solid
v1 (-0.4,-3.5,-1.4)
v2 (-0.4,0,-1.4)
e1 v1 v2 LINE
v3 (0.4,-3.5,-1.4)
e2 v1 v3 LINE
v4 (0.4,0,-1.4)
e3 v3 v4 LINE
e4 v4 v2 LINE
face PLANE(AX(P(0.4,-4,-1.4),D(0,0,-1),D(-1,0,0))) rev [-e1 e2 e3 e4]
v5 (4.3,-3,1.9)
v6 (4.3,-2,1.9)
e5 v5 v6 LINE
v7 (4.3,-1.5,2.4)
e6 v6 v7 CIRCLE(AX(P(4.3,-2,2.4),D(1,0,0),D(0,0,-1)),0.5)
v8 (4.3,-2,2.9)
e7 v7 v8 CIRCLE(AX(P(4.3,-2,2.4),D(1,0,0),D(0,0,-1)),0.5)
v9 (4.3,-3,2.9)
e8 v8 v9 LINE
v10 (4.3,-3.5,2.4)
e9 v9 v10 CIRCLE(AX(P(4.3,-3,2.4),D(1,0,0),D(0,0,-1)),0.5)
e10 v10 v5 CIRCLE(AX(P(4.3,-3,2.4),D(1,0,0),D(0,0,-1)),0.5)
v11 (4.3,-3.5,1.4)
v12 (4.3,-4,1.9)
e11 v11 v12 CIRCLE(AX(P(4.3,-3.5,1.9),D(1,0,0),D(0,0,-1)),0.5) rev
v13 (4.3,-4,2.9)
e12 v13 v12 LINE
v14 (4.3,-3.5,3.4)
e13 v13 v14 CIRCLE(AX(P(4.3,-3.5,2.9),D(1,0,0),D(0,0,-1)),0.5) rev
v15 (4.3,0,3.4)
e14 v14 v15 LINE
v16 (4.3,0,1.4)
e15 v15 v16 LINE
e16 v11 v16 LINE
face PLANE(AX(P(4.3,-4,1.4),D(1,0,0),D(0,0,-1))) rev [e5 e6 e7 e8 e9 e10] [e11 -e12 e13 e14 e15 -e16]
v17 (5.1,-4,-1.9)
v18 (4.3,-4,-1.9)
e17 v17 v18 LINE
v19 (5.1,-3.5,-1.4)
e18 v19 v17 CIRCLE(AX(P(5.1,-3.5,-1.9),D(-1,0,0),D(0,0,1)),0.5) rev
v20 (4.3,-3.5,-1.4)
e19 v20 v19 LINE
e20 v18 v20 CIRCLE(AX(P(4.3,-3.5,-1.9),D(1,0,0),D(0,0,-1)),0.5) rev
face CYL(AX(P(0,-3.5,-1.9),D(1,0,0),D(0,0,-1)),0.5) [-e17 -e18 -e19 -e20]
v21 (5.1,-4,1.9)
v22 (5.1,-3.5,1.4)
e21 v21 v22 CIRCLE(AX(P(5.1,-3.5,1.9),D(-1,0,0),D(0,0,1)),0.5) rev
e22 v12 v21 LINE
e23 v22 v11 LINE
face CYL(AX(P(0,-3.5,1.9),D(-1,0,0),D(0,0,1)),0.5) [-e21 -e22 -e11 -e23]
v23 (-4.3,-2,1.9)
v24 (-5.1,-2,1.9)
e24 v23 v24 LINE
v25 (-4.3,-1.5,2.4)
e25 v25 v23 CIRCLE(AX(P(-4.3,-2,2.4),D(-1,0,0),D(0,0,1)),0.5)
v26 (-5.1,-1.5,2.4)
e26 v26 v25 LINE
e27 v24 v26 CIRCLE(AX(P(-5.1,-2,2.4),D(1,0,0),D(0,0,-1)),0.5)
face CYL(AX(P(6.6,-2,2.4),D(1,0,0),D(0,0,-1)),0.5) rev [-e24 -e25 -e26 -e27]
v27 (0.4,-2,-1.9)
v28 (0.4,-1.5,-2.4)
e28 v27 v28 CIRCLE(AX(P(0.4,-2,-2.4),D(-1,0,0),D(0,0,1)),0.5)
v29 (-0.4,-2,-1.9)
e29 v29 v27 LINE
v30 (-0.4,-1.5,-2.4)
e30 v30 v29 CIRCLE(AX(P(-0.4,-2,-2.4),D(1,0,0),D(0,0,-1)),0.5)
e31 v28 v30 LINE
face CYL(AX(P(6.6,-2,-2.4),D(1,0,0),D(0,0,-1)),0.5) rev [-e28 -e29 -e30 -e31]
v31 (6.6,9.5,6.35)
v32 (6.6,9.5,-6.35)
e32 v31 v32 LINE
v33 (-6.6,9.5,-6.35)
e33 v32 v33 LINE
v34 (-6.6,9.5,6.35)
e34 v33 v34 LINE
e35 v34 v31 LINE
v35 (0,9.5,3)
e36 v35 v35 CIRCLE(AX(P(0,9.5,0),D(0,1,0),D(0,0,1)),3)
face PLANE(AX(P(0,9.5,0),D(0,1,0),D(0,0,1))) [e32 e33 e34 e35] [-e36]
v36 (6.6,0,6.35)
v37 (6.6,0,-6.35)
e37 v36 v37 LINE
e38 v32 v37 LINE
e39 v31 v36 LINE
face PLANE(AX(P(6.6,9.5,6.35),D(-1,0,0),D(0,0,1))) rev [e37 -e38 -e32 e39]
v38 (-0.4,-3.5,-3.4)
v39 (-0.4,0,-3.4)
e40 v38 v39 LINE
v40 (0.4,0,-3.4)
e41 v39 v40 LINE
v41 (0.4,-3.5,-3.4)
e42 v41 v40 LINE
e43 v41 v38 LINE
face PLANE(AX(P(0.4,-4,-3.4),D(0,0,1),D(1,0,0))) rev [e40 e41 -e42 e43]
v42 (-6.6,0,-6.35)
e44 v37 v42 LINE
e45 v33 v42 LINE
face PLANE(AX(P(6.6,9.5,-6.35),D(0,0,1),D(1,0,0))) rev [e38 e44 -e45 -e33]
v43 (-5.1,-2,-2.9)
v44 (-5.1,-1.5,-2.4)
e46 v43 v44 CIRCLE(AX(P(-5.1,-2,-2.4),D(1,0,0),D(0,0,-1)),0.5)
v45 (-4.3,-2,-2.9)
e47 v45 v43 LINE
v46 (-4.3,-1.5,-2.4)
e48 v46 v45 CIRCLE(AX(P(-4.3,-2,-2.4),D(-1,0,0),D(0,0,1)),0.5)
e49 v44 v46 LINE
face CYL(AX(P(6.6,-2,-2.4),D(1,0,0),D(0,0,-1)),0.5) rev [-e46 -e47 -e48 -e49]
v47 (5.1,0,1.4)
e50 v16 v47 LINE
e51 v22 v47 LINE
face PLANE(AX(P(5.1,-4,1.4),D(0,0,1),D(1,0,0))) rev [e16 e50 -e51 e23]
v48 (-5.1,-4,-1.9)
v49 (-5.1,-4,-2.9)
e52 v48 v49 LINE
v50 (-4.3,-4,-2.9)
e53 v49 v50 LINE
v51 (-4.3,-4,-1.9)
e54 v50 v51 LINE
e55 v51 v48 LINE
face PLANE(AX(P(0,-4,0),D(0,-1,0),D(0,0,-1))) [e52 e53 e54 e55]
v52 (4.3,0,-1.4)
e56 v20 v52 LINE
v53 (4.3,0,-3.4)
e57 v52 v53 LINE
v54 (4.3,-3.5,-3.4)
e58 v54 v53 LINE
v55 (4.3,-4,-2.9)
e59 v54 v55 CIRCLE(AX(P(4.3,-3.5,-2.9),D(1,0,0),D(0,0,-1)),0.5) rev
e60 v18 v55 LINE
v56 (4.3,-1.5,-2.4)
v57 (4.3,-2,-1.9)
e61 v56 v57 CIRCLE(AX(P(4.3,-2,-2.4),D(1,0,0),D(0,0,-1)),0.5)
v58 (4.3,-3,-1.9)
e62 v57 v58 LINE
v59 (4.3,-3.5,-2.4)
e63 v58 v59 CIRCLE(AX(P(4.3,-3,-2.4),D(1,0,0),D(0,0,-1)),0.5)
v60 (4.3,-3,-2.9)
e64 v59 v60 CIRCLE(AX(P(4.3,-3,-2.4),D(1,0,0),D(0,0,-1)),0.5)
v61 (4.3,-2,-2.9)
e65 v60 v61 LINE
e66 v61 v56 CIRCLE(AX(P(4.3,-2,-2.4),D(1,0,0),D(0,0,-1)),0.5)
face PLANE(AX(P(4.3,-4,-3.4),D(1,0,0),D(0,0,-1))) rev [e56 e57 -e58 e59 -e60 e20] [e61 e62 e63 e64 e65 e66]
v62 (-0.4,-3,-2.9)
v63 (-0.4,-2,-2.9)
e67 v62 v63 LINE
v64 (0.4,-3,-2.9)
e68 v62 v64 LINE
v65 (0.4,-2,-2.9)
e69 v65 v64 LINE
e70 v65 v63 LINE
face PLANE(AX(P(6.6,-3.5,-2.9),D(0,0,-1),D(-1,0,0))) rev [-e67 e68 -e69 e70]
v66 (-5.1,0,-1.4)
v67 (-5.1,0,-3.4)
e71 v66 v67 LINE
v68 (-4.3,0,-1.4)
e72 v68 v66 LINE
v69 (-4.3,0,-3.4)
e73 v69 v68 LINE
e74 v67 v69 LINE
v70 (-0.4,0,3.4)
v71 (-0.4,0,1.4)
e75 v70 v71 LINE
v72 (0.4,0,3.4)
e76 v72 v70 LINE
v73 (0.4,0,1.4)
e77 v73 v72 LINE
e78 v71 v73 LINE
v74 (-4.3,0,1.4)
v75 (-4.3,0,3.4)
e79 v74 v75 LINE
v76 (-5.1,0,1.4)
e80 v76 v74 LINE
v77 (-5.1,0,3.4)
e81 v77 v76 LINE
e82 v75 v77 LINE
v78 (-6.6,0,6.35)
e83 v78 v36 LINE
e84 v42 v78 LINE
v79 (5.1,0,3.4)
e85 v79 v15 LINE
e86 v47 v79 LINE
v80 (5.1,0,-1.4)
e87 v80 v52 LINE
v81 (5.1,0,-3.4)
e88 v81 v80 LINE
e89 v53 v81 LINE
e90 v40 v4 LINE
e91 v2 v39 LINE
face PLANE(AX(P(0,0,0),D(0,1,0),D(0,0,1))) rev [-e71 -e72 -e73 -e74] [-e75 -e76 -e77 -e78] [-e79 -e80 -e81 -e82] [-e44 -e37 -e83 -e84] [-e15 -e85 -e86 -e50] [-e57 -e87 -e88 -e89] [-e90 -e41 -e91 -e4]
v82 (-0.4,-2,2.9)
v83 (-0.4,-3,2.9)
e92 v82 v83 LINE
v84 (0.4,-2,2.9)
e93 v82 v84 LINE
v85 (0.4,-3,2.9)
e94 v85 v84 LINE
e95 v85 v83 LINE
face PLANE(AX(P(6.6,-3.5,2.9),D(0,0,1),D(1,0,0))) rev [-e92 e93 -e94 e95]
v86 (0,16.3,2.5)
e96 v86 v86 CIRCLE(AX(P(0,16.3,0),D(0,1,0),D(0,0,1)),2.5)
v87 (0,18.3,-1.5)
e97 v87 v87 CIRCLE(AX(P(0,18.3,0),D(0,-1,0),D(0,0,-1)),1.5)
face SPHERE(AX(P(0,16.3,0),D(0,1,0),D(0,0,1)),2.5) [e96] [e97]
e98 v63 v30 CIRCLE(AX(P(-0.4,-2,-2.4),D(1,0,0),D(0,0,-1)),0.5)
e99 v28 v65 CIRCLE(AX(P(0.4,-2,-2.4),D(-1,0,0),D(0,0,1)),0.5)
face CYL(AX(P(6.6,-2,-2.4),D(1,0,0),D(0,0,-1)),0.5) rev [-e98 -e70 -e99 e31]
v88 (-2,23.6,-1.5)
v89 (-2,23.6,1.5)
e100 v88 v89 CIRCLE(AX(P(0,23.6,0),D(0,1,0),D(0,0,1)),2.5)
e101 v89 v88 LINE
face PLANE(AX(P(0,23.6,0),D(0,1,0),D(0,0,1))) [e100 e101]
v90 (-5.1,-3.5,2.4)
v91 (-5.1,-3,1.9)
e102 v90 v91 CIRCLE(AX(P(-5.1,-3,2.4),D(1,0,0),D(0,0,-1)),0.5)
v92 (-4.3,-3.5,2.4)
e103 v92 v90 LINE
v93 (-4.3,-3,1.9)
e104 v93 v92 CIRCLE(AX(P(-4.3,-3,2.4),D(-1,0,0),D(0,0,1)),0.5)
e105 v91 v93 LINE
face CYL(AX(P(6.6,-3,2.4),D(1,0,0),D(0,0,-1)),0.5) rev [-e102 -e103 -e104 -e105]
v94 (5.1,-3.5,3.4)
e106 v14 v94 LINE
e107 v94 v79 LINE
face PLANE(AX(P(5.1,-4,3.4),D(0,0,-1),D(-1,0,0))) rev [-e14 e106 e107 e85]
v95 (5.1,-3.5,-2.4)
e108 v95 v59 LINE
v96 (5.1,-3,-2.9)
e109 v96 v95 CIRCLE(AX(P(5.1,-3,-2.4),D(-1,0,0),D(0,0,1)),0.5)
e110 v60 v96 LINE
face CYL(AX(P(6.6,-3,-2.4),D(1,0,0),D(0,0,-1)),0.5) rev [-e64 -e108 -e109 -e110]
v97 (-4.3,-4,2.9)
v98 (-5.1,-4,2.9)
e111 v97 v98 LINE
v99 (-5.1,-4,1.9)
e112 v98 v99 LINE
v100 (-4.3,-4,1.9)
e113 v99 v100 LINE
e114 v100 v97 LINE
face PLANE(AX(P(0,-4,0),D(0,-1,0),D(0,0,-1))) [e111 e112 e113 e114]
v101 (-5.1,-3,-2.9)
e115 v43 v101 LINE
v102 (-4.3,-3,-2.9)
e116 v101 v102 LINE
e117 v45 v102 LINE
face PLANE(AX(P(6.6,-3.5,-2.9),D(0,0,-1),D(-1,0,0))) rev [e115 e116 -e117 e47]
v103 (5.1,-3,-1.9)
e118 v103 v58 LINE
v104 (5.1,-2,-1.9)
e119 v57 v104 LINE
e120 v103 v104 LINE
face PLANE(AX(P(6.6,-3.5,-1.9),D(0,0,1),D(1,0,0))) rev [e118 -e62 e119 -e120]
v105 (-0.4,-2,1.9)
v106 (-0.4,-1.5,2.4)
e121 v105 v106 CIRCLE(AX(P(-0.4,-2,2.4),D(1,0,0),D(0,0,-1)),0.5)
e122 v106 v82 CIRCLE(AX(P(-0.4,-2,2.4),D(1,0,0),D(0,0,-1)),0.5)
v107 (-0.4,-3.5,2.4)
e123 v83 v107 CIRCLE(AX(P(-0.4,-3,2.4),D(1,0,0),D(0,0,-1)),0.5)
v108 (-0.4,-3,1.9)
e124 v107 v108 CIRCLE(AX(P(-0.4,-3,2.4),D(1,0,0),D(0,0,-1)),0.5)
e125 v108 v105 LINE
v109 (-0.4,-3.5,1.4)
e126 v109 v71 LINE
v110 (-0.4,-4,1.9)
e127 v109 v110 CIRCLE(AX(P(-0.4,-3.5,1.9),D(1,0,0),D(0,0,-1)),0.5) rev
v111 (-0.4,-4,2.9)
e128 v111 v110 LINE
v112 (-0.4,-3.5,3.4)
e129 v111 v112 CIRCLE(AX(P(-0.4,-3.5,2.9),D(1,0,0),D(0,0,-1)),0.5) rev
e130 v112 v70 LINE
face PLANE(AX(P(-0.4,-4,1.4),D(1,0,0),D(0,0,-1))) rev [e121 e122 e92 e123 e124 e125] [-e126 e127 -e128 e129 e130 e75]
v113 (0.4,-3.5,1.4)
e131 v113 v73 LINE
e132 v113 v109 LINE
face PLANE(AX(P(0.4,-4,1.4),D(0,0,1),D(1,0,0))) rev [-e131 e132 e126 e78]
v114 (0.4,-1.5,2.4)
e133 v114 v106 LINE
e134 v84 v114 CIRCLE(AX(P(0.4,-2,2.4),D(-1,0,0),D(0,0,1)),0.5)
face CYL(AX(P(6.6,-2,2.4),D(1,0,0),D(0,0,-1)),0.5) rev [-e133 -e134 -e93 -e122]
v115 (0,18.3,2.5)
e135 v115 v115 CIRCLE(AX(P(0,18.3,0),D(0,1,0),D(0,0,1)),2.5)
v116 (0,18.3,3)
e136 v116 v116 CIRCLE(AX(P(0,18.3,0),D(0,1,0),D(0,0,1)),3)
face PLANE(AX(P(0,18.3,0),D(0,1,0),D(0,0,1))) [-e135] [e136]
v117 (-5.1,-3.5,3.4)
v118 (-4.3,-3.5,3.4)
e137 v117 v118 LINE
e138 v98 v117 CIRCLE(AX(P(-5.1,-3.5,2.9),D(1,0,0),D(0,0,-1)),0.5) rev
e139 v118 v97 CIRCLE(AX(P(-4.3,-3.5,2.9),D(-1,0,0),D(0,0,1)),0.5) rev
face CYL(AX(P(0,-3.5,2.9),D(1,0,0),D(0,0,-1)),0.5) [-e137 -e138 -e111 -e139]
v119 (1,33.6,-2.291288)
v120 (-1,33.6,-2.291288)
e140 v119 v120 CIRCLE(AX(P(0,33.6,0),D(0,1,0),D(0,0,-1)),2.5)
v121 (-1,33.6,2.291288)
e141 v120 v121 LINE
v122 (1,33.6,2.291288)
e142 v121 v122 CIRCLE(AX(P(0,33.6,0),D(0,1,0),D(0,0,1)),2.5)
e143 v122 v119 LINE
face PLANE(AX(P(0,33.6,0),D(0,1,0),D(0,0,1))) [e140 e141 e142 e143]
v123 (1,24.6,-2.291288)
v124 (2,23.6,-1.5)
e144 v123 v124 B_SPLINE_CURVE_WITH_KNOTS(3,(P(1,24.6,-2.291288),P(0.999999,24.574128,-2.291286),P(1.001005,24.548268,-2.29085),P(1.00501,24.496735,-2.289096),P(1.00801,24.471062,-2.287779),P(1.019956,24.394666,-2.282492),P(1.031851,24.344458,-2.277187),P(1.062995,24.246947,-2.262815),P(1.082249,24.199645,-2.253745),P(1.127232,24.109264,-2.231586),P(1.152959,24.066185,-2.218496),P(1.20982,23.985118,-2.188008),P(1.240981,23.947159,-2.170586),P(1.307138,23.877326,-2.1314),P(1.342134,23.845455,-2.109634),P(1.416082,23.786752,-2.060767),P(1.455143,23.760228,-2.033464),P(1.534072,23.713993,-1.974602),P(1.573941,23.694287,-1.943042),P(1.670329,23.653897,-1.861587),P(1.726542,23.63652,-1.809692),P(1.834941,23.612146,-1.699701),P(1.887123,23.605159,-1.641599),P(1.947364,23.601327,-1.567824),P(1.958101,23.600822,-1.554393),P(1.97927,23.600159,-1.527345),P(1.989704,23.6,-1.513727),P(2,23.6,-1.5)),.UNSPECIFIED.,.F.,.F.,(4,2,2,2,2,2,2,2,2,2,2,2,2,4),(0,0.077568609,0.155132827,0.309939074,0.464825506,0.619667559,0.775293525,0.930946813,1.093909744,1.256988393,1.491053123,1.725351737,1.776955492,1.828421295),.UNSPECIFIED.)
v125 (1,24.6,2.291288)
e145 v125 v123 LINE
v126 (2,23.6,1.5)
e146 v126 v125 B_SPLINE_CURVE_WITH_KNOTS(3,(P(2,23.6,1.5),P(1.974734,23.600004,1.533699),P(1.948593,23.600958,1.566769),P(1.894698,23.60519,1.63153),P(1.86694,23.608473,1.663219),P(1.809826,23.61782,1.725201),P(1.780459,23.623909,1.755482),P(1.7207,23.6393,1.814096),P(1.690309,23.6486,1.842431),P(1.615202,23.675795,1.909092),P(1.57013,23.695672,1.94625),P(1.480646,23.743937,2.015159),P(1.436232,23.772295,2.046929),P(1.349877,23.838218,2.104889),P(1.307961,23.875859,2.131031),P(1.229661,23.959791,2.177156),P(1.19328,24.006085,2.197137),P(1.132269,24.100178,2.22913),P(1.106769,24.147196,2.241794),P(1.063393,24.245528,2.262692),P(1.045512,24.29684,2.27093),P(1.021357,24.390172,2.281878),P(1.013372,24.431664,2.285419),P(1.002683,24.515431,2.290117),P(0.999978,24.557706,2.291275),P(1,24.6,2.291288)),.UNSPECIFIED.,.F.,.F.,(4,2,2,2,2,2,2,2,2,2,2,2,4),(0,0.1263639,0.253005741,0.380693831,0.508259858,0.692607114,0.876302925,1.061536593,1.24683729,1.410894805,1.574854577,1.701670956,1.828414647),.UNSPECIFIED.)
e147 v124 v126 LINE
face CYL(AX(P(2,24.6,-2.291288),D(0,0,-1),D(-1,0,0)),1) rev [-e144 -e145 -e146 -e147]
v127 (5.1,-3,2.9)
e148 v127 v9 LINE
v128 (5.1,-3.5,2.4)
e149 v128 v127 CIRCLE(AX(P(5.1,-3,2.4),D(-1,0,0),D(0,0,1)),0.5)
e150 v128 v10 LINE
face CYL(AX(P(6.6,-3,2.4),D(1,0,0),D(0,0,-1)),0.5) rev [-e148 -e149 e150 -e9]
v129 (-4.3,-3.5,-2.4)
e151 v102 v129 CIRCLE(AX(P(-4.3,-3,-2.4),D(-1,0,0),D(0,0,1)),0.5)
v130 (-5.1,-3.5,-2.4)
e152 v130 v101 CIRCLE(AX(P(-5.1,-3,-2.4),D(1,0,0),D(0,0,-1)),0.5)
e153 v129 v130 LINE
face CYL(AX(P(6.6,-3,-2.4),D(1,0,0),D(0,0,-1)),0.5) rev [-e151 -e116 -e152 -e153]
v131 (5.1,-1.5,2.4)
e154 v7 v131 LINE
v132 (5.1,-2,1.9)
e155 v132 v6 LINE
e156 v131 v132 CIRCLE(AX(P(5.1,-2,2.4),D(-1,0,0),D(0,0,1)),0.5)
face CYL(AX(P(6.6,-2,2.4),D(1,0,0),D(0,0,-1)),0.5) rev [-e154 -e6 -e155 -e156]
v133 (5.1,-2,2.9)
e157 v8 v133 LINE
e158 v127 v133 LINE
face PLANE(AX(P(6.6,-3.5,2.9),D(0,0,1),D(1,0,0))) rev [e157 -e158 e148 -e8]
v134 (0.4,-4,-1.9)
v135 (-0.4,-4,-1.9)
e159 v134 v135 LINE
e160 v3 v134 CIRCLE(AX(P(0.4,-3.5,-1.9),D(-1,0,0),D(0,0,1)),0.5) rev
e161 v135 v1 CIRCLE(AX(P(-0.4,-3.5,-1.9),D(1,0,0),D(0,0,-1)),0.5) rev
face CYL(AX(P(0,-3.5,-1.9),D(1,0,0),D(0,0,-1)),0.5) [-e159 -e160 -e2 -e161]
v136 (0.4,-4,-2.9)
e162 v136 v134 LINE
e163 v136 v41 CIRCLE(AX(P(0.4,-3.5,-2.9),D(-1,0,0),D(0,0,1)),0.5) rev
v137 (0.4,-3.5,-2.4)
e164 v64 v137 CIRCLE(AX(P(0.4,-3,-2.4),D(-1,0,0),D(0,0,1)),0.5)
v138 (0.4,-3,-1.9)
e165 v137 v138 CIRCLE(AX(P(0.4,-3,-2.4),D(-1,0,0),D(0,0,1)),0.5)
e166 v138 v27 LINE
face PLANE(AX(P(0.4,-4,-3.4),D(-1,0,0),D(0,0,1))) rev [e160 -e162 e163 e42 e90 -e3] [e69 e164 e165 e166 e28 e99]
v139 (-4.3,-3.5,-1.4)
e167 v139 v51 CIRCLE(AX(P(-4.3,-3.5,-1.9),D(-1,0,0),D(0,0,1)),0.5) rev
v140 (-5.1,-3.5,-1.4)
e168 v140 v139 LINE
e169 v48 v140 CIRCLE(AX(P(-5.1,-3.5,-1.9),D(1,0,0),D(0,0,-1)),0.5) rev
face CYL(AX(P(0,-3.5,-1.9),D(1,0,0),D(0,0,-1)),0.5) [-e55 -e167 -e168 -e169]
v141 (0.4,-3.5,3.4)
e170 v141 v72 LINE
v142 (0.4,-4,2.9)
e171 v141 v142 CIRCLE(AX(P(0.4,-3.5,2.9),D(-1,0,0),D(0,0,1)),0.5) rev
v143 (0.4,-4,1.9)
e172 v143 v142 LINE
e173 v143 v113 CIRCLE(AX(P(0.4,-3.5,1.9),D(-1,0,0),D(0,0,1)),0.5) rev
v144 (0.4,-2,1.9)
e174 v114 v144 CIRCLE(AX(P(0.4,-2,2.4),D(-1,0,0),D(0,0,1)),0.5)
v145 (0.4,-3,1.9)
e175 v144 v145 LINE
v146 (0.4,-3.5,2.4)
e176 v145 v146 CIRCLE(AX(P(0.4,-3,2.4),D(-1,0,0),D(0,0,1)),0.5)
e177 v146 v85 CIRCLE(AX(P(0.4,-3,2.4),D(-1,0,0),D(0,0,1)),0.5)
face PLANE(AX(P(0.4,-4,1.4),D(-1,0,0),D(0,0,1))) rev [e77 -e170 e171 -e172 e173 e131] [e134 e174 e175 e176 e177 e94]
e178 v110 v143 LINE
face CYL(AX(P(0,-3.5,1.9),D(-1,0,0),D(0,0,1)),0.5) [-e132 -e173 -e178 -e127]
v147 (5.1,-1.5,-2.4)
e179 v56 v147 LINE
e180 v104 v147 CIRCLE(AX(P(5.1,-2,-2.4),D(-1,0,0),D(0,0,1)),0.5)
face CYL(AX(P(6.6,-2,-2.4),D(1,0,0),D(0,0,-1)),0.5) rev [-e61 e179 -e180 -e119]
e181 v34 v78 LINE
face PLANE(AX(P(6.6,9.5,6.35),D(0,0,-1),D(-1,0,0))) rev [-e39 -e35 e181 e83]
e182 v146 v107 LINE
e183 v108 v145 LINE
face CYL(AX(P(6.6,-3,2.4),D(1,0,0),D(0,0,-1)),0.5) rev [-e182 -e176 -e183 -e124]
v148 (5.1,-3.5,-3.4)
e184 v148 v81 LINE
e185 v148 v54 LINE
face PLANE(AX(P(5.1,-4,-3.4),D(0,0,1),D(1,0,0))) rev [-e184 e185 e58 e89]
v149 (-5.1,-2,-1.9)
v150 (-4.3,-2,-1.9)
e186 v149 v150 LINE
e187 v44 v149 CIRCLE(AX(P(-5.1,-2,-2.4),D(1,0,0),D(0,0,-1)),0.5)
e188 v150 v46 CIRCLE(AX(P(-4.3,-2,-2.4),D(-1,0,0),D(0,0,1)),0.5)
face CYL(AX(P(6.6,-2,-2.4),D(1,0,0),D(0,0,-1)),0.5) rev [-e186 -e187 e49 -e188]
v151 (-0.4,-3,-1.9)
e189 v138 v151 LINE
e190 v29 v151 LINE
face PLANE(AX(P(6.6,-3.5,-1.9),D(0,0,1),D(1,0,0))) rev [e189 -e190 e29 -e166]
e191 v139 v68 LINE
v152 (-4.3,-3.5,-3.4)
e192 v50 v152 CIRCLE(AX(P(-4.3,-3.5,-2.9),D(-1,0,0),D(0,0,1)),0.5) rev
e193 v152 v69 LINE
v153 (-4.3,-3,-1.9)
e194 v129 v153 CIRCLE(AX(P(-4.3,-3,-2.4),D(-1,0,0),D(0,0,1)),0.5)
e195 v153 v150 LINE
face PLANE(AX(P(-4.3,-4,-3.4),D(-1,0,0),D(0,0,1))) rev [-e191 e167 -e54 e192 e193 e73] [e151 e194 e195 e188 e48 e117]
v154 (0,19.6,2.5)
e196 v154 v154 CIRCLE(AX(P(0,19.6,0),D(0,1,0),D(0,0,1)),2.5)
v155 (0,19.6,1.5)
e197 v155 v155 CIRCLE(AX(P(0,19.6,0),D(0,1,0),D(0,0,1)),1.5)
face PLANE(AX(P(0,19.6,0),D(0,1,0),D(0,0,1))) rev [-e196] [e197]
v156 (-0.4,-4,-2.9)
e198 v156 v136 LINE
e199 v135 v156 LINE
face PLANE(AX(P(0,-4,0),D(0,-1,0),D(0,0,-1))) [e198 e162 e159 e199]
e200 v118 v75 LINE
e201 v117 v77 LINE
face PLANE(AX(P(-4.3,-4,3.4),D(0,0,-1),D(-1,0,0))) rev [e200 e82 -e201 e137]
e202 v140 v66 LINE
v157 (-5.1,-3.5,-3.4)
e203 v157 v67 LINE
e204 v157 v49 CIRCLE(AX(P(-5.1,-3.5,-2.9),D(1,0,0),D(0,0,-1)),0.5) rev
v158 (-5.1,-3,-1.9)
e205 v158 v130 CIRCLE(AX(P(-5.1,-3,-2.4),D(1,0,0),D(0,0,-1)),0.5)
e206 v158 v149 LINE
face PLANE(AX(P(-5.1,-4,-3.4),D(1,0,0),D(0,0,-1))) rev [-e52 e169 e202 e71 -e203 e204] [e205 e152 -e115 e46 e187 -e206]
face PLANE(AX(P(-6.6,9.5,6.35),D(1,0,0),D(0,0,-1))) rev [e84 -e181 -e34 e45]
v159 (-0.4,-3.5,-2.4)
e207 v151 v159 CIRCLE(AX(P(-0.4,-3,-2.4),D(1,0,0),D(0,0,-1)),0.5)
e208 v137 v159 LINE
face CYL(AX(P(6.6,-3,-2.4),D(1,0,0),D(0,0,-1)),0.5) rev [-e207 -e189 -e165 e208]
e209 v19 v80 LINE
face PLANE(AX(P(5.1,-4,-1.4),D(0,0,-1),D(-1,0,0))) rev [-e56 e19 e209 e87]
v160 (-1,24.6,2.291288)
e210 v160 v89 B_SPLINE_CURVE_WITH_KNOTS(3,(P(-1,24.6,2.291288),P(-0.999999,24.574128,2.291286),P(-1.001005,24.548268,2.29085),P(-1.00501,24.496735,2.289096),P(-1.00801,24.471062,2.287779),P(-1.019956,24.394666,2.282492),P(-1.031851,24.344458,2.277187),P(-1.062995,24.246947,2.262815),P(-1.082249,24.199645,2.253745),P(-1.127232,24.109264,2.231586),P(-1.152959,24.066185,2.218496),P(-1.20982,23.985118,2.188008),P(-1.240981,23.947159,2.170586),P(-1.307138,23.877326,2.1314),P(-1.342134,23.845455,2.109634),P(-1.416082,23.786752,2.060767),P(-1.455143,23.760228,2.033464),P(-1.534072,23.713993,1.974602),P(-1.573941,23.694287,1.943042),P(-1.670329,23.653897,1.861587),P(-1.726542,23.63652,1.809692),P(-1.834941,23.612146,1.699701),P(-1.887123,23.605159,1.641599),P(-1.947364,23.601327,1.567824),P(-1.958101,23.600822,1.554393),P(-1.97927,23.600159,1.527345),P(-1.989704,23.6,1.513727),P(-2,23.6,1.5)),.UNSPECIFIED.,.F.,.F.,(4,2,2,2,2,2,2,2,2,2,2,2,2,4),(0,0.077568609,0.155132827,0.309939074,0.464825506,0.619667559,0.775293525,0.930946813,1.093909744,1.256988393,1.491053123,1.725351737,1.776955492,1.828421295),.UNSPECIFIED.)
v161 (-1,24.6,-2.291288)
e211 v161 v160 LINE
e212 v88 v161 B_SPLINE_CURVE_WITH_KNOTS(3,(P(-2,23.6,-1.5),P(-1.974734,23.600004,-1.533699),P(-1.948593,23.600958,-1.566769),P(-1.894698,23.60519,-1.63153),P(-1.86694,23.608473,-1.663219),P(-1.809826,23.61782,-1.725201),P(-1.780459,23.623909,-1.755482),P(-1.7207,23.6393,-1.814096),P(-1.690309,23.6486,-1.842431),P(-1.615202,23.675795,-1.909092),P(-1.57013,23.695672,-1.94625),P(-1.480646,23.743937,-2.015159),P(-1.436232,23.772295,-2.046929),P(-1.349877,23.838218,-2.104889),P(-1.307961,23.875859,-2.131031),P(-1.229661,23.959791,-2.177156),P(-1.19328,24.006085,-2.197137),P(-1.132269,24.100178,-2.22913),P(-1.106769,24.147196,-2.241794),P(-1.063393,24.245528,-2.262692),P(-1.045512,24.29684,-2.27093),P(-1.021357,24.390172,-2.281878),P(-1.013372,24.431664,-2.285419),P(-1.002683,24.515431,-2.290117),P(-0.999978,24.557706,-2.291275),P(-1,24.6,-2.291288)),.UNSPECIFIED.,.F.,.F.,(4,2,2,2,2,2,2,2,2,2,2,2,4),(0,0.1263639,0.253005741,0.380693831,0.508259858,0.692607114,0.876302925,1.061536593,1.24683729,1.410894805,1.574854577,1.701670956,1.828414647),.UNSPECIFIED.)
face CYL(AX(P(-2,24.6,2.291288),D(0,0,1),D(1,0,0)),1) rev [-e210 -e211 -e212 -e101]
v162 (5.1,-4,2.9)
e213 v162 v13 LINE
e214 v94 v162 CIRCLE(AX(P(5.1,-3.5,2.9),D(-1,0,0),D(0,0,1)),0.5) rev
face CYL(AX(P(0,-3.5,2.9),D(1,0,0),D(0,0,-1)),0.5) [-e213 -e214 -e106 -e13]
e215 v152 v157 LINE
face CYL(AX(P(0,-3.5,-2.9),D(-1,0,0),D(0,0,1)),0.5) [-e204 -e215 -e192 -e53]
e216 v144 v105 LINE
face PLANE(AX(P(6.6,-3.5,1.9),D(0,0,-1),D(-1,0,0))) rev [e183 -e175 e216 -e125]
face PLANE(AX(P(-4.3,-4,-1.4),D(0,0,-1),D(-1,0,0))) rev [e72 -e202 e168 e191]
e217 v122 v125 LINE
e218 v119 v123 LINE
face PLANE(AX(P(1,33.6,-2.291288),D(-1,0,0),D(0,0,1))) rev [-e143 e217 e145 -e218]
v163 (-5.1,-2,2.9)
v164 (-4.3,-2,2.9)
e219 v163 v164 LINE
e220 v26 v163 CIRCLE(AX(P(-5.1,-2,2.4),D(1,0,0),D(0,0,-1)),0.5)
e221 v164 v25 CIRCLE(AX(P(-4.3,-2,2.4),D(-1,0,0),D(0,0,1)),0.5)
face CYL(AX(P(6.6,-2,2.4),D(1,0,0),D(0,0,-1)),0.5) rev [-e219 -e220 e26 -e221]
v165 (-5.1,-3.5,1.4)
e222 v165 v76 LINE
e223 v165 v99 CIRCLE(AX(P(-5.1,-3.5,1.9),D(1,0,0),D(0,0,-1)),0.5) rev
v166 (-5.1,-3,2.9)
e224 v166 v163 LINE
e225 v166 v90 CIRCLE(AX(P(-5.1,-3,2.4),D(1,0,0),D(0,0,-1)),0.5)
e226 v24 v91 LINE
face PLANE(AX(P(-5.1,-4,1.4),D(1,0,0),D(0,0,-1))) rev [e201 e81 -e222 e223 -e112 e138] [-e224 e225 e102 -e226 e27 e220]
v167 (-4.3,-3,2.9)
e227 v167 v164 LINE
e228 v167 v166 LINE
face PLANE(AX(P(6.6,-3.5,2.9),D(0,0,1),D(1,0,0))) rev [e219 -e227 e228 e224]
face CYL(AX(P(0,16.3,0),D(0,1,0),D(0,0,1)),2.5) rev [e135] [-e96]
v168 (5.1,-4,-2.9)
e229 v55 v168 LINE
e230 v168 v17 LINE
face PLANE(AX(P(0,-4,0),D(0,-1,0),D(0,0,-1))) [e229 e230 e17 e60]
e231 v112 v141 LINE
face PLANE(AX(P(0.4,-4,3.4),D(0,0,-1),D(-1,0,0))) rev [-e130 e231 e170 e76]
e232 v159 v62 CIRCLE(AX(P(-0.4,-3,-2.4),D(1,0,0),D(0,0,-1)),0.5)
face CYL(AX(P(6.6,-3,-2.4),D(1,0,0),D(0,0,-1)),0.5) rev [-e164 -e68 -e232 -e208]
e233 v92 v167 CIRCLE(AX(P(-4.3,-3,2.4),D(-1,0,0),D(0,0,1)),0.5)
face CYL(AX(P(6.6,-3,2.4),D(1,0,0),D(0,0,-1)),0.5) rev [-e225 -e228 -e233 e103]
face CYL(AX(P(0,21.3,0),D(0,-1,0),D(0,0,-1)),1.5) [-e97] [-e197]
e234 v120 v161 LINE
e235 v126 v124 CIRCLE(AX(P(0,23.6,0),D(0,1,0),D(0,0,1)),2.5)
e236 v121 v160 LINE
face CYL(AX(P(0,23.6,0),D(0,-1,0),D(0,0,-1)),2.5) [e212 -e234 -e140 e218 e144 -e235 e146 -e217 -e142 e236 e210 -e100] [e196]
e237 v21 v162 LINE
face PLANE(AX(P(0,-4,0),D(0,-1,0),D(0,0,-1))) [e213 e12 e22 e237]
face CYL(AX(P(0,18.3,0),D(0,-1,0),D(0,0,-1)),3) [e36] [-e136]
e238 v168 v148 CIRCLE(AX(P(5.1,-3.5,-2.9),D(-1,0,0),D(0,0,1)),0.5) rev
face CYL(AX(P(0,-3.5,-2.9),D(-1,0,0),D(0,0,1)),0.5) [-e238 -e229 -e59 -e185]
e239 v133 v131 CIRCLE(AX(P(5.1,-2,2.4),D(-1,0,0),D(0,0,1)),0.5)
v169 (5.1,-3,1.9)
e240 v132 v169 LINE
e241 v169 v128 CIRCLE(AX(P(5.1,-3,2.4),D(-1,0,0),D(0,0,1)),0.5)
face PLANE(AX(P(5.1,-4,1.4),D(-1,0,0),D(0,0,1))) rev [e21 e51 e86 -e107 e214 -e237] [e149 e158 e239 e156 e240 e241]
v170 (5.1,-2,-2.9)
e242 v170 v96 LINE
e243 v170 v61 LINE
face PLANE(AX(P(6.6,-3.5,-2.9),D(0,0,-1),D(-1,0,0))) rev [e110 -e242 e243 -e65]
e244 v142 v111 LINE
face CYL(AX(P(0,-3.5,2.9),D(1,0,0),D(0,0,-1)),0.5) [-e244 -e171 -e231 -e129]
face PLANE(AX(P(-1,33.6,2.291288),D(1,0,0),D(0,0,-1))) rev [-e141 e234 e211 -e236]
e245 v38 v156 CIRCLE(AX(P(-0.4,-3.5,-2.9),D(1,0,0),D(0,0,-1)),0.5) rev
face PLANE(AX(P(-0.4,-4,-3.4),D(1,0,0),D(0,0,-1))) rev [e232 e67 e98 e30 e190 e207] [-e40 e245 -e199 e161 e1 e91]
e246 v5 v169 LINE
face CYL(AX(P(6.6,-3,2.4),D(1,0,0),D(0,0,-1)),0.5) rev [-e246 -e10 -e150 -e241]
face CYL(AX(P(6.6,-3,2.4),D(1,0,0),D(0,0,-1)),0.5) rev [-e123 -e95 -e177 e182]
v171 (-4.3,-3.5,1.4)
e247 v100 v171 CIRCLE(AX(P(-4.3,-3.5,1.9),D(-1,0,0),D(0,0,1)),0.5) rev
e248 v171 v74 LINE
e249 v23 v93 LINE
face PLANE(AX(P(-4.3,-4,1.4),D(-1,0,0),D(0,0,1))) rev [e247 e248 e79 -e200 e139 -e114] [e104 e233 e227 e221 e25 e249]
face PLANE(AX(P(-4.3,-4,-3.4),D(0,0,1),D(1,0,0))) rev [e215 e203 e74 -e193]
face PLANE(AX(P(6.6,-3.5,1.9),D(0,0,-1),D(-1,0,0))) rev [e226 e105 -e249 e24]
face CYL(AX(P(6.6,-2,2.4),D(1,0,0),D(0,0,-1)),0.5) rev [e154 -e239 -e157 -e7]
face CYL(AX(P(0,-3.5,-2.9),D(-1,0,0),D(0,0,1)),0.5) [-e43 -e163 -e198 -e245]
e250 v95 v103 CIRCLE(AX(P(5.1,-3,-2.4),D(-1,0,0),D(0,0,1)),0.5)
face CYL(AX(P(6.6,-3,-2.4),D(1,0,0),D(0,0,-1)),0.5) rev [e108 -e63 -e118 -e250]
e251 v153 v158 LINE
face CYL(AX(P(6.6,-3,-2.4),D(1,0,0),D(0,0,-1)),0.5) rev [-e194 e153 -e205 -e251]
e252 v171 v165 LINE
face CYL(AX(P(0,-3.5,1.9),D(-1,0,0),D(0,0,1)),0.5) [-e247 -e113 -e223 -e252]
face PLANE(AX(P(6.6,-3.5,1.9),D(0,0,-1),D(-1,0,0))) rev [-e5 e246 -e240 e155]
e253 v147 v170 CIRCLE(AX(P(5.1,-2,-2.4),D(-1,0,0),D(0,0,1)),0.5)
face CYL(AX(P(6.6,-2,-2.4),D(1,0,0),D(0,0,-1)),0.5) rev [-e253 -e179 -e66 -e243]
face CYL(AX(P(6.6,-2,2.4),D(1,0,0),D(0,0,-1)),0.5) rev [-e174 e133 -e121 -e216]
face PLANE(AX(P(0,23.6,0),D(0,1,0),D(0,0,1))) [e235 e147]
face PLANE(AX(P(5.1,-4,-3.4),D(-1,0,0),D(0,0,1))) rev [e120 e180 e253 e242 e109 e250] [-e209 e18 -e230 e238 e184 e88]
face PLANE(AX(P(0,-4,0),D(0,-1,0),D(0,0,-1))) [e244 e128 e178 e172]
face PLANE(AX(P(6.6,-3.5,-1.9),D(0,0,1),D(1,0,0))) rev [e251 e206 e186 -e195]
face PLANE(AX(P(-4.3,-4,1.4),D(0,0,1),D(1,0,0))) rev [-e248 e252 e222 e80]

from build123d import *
from build123d.topology import SkipClean

# Parameters (mm, degrees)
SKETCH1_W           = 13.2
SKETCH1_H           = 12.7
BOSS_EXTRUDE1_DEPTH = 9.5
SKETCH2_R           = 3
BOSS_EXTRUDE2_DEPTH = 8.8
SKETCH4_R           = 2.5
CUT_EXTRUDE1_DEPTH  = 2
SKETCH5_R           = 1.5
BOSS_EXTRUDE3_DEPTH = 5
REVOLVE2_ANGLE      = 180
FILLET1_R           = 1
SKETCH6_W           = 0.8
SKETCH6_H           = 2
BOSS_EXTRUDE4_DEPTH = 4
SKETCH7_W           = 1
SKETCH7_H           = 2
CUT_EXTRUDE2_DEPTH  = 26.117773
FILLET2_R           = 0.5
BOSS_EXTRUDE5_START = 5.3
SKETCH8_R           = 2.5
BOSS_EXTRUDE5_DEPTH = 4
BOSS_EXTRUDE6_START = 10
BOSS_EXTRUDE6_DEPTH = 10
FILLET3_R           = 1


# Some blends are built 0.0001 mm under size
with BuildPart() as part:
    # Sketch1 → Boss-Extrude1 (new body)
    with BuildSketch(Plane(origin=(0, 0, 0), x_dir=(1, 0, 0), z_dir=(0, 1, 0))):
        Rectangle(SKETCH1_W, SKETCH1_H)
    extrude(amount=BOSS_EXTRUDE1_DEPTH)

    # Sketch2 → Boss-Extrude2 (add)
    with BuildSketch(Plane(origin=(0, 9.5, 0), x_dir=(1, 0, 0), z_dir=(0, 1, 0))):
        with Locations(Location((0, 0, 0), (0, 0, 270))):
            Circle(SKETCH2_R)
    extrude(amount=BOSS_EXTRUDE2_DEPTH)

    # Sketch4 → Cut-Extrude1 (cut)
    with BuildSketch(Plane(origin=(0, 18.3, 0), x_dir=(1, 0, 0), z_dir=(0, 1, 0))):
        with Locations(Location((0, 0, 0), (0, 0, 270))):
            Circle(SKETCH4_R)
    extrude(amount=-CUT_EXTRUDE1_DEPTH, mode=Mode.SUBTRACT)

    # Sketch5 → Boss-Extrude3 (add)
    with BuildSketch(Plane(origin=(0, 16.3, 0), x_dir=(1, 0, 0), z_dir=(0, 1, 0))):
        with Locations(Location((0, 0, 0), (0, 0, 270))):
            Circle(SKETCH5_R)
    extrude(amount=BOSS_EXTRUDE3_DEPTH)

    # Sketch3 → Revolve2 (revolve)
    with BuildSketch(Plane(origin=(0, 16.3, 0), x_dir=(1, 0, 0), z_dir=(0, 1, 0))):
        with BuildLine():
            Line((0, -2.5), (0, 2.5))
            ThreePointArc((0, 2.5), (-2.5, 0), (0, -2.5))
        make_face()
    revolve(axis=Axis((0, 16.3, 3), (0, 0, -1)), revolution_arc=REVOLVE2_ANGLE)

    # Fillet1
    fillet1_edges = [part.edges().sort_by_distance(p)[0] for p in [
        (0, 21.3, -1.5),
    ]]
    fillet(fillet1_edges, radius=FILLET1_R)

    # Sketch6 → Boss-Extrude4 (add)
    with BuildSketch(Plane.XZ):
        with Locations((-4.7, 2.4)):
            Rectangle(SKETCH6_W, SKETCH6_H)
        with Locations((-4.7, -2.4)):
            Rectangle(SKETCH6_W, SKETCH6_H)
        with Locations((0, -2.4)):
            Rectangle(SKETCH6_W, SKETCH6_H)
        with Locations((0, 2.4)):
            Rectangle(SKETCH6_W, SKETCH6_H)
        with Locations((4.7, 2.4)):
            Rectangle(SKETCH6_W, SKETCH6_H)
        with Locations((4.7, -2.4)):
            Rectangle(SKETCH6_W, SKETCH6_H)
    extrude(amount=BOSS_EXTRUDE4_DEPTH)

    # Sketch7 → Cut-Extrude2 (cut, through all)
    with BuildSketch(Plane.ZY.offset(5.1)):
        with Locations((-2.4, -2.5)):
            Rectangle(SKETCH7_W, SKETCH7_H)
        with Locations((2.4, -2.5)):
            Rectangle(SKETCH7_W, SKETCH7_H)
    extrude(amount=-CUT_EXTRUDE2_DEPTH, mode=Mode.SUBTRACT)

    # Fillet2
    fillet2_edges = [part.edges().sort_by_distance(p)[0] for p in [
        (4.7, -3.5, 2.9),
        (4.7, -3.5, 1.9),
        (4.7, -3.5, -1.9),
        (4.7, -3.5, -2.9),
        (4.7, -1.5, -1.9),
        (4.7, -1.5, 2.9),
        (4.7, -1.5, 1.9),
        (4.7, -1.5, -2.9),
        (0, -1.5, 1.9),
        (0, -1.5, 2.9),
        (0, -3.5, 2.9),
        (0, -3.5, 1.9),
        (0, -3.5, -1.9),
        (0, -3.5, -2.9),
        (0, -1.5, -2.9),
        (0, -1.5, -1.9),
        (-4.7, -3.5, 2.9),
        (-4.7, -1.5, 2.9),
        (-4.7, -3.5, 1.9),
        (-4.7, -1.5, 1.9),
        (-4.7, -1.5, -1.9),
        (-4.7, -1.5, -2.9),
        (-4.7, -3.5, -1.9),
        (-4.7, -3.5, -2.9),
        (0, -4, -1.4),
        (0, -4, -3.4),
        (4.7, -4, -1.4),
        (4.7, -4, -3.4),
        (4.7, -4, 1.4),
        (4.7, -4, 3.4),
        (0, -4, 3.4),
        (0, -4, 1.4),
        (-4.7, -4, 3.4),
        (-4.7, -4, 1.4),
        (-4.7, -4, -1.4),
        (-4.7, -4, -3.4),
    ]]
    fillet(fillet2_edges, radius=FILLET2_R - 0.0001)  # a hair under: the kernel refuses the full size

    # Sketch8 → Boss-Extrude5 (add)
    with BuildSketch(Plane(origin=(0, 18.3, 0), x_dir=(1, 0, 0), z_dir=(0, 1, 0)).offset(BOSS_EXTRUDE5_START)):
        with Locations(Location((0, 0, 0), (0, 0, 270))):
            Circle(SKETCH8_R)
    extrude(amount=-BOSS_EXTRUDE5_DEPTH)

    # Sketch9 → Boss-Extrude6 (add)
    with SkipClean():  # the faces are left unmerged after this step: merging them gives an invalid solid
        with BuildSketch(Plane(origin=(0, 23.6, 0), x_dir=(1, 0, 0), z_dir=(0, 1, 0)).offset(BOSS_EXTRUDE6_START)):
            with BuildLine():
                Line((-1, -2.291288), (-1, 2.291288))
                ThreePointArc((-1, 2.291288), (0, 2.5), (1, 2.291288))
                Line((1, 2.291288), (1, -2.291288))
                ThreePointArc((1, -2.291288), (0, -2.5), (-1, -2.291288))
            make_face()
        extrude(amount=-BOSS_EXTRUDE6_DEPTH)

    # Fillet3
    # the kernel refuses this fillet: 1 mm, written as the material it adds along each edge
    with BuildSketch(Plane(origin=(1, 23.6, -4.791288), x_dir=(1, 0, 0), z_dir=(0, 0, 1))) as fillet3_piece_1_section:
        with BuildLine():
            CenterArc((FILLET3_R, FILLET3_R), FILLET3_R, 180, 90)
            Line((0, FILLET3_R), (0, 0))
            Line((0, 0), (FILLET3_R, 0))
        make_face()
    fillet3_piece_1 = extrude(amount=9.582576, mode=Mode.PRIVATE)
    fillet3_piece_1 = fillet3_piece_1 & Plane(origin=(0, 23.834238, 0), x_dir=(0, 0, 1), z_dir=(0, 1, 0)) * Cylinder(2.5, 24, mode=Mode.PRIVATE)
    add(fillet3_piece_1)
    with BuildSketch(Plane(origin=(-1, 23.6, 4.791288), x_dir=(-1, 0, 0), z_dir=(0, 0, -1))) as fillet3_piece_2_section:
        with BuildLine():
            CenterArc((FILLET3_R, FILLET3_R), FILLET3_R, 180, 90)
            Line((0, FILLET3_R), (0, 0))
            Line((0, 0), (FILLET3_R, 0))
        make_face()
    fillet3_piece_2 = extrude(amount=9.582576, mode=Mode.PRIVATE)
    fillet3_piece_2 = fillet3_piece_2 & Plane(origin=(0, 23.834238, 0), x_dir=(0, 0, 1), z_dir=(0, 1, 0)) * Cylinder(2.5, 24, mode=Mode.PRIVATE)
    add(fillet3_piece_2)


solid = part.part
